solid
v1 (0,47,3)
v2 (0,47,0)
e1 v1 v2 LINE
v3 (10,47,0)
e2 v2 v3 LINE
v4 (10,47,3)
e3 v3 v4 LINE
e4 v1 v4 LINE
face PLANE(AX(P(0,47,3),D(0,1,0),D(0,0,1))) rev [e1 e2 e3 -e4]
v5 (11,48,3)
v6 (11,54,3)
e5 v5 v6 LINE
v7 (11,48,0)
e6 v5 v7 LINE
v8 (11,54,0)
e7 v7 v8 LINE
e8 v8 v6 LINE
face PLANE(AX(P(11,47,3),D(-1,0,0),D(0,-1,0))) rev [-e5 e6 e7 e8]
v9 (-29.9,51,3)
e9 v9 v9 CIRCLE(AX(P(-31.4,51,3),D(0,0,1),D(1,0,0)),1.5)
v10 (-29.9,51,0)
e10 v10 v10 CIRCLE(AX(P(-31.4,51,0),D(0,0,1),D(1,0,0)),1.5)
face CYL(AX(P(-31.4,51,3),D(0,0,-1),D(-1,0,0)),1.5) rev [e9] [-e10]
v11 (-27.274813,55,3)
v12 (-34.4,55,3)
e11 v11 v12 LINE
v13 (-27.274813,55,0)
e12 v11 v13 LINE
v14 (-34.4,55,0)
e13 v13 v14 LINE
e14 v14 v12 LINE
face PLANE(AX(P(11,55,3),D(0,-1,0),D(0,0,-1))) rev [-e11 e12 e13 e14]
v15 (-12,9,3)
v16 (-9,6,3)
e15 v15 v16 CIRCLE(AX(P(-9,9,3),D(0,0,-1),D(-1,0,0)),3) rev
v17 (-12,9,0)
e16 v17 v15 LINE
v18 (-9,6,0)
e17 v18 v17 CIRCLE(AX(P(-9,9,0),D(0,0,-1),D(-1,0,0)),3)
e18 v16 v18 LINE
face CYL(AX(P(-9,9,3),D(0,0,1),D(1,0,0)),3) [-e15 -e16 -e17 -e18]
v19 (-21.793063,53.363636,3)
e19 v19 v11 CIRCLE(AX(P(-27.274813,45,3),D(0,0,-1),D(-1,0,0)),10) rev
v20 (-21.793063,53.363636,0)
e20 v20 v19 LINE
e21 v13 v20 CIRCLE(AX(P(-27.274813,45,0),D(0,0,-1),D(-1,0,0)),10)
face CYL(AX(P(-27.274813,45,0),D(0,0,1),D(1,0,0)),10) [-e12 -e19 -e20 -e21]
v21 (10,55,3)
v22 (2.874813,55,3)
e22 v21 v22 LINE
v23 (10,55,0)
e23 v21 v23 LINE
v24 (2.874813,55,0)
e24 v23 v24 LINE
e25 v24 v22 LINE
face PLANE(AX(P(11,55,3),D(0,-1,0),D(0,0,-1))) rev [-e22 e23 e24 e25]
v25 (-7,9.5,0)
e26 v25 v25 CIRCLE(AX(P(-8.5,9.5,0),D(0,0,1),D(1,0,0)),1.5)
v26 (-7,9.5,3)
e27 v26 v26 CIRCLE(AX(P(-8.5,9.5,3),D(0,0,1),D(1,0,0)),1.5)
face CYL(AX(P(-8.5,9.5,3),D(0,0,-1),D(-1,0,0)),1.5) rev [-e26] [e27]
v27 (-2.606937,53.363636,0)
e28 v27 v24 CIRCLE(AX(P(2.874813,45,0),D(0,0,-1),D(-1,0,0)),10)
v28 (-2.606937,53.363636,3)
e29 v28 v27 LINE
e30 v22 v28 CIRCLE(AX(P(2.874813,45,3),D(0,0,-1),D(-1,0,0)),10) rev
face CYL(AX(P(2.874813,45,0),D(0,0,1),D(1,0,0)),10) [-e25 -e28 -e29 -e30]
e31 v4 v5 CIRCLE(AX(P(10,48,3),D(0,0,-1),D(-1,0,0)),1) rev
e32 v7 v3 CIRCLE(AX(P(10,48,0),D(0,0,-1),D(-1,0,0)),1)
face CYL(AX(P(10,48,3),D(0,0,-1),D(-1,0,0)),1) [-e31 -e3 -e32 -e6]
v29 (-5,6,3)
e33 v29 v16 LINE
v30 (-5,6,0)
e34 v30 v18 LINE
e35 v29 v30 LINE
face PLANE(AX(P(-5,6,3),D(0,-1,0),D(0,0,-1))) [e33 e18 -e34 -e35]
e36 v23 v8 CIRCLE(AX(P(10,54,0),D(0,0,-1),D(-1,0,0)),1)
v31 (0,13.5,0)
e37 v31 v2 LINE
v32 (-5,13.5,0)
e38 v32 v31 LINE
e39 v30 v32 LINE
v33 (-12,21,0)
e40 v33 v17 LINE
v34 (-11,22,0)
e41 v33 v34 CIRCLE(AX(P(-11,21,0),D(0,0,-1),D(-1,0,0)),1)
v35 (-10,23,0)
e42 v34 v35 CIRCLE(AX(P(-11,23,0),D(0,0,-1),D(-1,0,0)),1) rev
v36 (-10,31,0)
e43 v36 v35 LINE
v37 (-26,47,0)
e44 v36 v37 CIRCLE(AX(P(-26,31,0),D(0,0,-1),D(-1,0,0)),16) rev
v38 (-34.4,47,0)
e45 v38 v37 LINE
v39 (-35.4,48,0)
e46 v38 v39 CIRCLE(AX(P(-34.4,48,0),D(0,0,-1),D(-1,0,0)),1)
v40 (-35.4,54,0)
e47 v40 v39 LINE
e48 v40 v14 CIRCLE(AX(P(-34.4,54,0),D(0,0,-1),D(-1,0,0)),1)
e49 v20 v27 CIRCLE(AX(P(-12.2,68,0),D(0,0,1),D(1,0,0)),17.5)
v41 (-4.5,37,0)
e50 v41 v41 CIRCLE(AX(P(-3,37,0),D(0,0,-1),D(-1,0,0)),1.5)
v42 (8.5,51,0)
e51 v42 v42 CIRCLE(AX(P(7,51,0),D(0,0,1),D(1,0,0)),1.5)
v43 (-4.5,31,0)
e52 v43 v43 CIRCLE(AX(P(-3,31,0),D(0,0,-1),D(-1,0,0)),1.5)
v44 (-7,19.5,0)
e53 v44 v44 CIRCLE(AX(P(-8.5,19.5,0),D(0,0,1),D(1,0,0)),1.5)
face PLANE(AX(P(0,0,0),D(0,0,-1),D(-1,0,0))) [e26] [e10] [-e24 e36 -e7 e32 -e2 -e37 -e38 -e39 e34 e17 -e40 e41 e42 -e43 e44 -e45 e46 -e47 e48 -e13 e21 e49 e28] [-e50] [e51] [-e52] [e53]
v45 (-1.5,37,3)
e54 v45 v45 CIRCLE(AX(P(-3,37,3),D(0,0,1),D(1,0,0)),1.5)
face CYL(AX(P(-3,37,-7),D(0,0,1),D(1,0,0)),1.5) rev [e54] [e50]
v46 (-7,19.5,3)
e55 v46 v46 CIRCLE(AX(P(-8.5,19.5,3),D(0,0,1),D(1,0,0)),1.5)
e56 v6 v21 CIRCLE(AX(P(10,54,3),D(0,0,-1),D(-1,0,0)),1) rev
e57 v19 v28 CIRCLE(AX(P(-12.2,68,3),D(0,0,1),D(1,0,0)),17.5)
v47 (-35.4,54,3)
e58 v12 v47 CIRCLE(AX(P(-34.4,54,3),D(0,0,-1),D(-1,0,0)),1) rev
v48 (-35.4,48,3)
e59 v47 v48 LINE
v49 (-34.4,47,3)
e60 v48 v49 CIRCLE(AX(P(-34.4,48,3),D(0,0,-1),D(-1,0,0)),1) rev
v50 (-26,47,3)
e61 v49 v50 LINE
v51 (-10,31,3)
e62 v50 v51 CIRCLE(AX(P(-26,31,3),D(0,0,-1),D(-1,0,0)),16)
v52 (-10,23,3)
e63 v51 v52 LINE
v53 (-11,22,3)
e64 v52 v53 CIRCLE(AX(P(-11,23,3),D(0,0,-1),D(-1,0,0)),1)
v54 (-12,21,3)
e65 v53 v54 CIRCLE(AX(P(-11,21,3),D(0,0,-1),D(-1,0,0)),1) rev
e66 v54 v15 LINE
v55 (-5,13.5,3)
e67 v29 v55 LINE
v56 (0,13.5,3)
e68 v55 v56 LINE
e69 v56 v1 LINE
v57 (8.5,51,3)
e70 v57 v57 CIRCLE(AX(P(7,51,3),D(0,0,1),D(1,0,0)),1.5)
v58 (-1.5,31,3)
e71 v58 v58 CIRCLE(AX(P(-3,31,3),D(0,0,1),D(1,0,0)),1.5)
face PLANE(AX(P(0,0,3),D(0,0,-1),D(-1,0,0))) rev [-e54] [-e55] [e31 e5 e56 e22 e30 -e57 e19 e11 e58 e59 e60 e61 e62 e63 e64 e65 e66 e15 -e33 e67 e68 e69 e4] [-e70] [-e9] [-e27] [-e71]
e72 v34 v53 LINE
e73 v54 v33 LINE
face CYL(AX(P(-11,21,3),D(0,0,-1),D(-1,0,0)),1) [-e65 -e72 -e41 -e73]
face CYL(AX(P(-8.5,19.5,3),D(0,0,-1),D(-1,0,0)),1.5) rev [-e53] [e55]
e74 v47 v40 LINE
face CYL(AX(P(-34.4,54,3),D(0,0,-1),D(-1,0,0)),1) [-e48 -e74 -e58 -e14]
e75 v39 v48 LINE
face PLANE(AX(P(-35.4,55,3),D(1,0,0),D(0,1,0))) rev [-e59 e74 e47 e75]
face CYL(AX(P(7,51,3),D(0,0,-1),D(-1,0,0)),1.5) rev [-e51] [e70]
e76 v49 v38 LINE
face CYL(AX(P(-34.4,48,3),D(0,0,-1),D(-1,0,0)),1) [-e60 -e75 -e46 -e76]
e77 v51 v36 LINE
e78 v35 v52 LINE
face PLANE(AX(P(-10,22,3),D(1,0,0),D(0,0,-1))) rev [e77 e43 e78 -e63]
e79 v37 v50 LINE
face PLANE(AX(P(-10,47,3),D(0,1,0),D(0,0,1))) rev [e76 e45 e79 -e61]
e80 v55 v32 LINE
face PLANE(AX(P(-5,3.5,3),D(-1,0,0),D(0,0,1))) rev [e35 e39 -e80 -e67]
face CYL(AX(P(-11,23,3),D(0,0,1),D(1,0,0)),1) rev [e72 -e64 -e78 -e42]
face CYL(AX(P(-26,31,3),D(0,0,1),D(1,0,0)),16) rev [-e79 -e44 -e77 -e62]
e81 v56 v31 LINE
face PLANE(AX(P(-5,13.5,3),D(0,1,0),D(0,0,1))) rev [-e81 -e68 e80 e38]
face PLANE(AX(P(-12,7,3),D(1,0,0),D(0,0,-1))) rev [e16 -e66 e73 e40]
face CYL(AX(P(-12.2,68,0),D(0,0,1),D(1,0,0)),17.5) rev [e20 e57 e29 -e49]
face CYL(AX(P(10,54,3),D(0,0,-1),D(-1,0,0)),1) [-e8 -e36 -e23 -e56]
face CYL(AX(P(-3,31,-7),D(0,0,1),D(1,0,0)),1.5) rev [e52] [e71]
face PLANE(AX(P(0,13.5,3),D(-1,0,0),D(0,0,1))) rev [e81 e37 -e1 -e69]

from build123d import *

# Parameters (mm, degrees)
SKETCH_1_R          = 1.5
EXTRUDE_1_DEPTH     = 3
FILLET_1_R          = 1
FILLET_4_R          = 16
SKETCH_2_R          = 17.5
CUT_EXTRUDE_1_DEPTH = 3
FILLET_5_R          = 10
SKETCH_3_W          = 10
SKETCH_3_H          = 7
CUT_EXTRUDE_2_DEPTH = 10
SKETCH_4_W          = 7
SKETCH_4_H          = 1
EXTRUDE_2_DEPTH     = 3
FILLET_7_R          = 3
SKETCH_5_R          = 1.5
CUT_EXTRUDE_3_DEPTH = 10


with BuildPart() as part:
    # 草图1 → 凸台-拉伸1 (new body)
    with BuildSketch(Plane.XY):
        Polygon((0, 0), (0, 3.5), (-5, 3.5), (-5, 13.5), (0, 13.5), (0, 47), (11, 47), (11, 55), (-35.4, 55), (-35.4, 47), (-10, 47), (-10, 22), (-12, 22), (-12, 7), (-10, 7), (-10, 0), align=None)
        with Locations((7, 51)):
            Circle(SKETCH_1_R, mode=Mode.SUBTRACT)
        with Locations((-31.4, 51)):
            Circle(SKETCH_1_R, mode=Mode.SUBTRACT)
        with Locations((-8.5, 19.5)):
            Circle(SKETCH_1_R, mode=Mode.SUBTRACT)
        with Locations((-8.5, 9.5)):
            Circle(SKETCH_1_R, mode=Mode.SUBTRACT)
    extrude(amount=EXTRUDE_1_DEPTH)

    # 圆角1
    fillet_1_edges = [part.edges().sort_by_distance(p)[0] for p in [
        (11, 55, 1.5),
        (11, 47, 1.5),
        (-35.4, 47, 1.5),
        (-35.4, 55, 1.5),
        (-10, 22, 1.5),
        (-12, 22, 1.5),
    ]]
    fillet(fillet_1_edges, radius=FILLET_1_R - 0.0001)  # a hair under: the kernel refuses the full size

    # 圆角4
    fillet_4_edges = [part.edges().sort_by_distance(p)[0] for p in [
        (-10, 47, 1.5),
    ]]
    fillet(fillet_4_edges, radius=FILLET_4_R)

    # 草图2 → 切除-拉伸1 (cut)
    with BuildSketch(Plane.XY.offset(3)):
        with Locations((-12.2, 68)):
            Circle(SKETCH_2_R)
    extrude(amount=-CUT_EXTRUDE_1_DEPTH, mode=Mode.SUBTRACT)

    # 圆角5
    fillet_5_edges = [part.edges().sort_by_distance(p)[0] for p in [
        (-23.915374514, 55, 1.5),
        (-0.484625486, 55, 1.5),
    ]]
    fillet(fillet_5_edges, radius=FILLET_5_R)

    # 草图3 → 切除-拉伸2 (cut)
    with BuildSketch(Plane(origin=(0, 0, 0), x_dir=(-1, 0, 0), z_dir=(0, 0, -1))):
        with Locations((5, 3.5)):
            Rectangle(SKETCH_3_W, SKETCH_3_H)
    extrude(amount=-CUT_EXTRUDE_2_DEPTH, mode=Mode.SUBTRACT)

    # 草图4 → 凸台-拉伸2 (add)
    with BuildSketch(Plane(origin=(0, 0, 0), x_dir=(-1, 0, 0), z_dir=(0, 0, -1))):
        with Locations((8.5, 6.5)):
            Rectangle(SKETCH_4_W, SKETCH_4_H)
    extrude(amount=-EXTRUDE_2_DEPTH)

    # 圆角7
    fillet_7_edges = [part.edges().sort_by_distance(p)[0] for p in [
        (-12, 6, 1.5),
    ]]
    fillet(fillet_7_edges, radius=FILLET_7_R)

    # 草图5 → 切除-拉伸3 (cut)
    with BuildSketch(Plane.XY.offset(3)):
        with Locations((-3, 31)):
            Circle(SKETCH_5_R)
        with Locations((-3, 37)):
            Circle(SKETCH_5_R)
    extrude(amount=-CUT_EXTRUDE_3_DEPTH, mode=Mode.SUBTRACT)


solid = part.part
